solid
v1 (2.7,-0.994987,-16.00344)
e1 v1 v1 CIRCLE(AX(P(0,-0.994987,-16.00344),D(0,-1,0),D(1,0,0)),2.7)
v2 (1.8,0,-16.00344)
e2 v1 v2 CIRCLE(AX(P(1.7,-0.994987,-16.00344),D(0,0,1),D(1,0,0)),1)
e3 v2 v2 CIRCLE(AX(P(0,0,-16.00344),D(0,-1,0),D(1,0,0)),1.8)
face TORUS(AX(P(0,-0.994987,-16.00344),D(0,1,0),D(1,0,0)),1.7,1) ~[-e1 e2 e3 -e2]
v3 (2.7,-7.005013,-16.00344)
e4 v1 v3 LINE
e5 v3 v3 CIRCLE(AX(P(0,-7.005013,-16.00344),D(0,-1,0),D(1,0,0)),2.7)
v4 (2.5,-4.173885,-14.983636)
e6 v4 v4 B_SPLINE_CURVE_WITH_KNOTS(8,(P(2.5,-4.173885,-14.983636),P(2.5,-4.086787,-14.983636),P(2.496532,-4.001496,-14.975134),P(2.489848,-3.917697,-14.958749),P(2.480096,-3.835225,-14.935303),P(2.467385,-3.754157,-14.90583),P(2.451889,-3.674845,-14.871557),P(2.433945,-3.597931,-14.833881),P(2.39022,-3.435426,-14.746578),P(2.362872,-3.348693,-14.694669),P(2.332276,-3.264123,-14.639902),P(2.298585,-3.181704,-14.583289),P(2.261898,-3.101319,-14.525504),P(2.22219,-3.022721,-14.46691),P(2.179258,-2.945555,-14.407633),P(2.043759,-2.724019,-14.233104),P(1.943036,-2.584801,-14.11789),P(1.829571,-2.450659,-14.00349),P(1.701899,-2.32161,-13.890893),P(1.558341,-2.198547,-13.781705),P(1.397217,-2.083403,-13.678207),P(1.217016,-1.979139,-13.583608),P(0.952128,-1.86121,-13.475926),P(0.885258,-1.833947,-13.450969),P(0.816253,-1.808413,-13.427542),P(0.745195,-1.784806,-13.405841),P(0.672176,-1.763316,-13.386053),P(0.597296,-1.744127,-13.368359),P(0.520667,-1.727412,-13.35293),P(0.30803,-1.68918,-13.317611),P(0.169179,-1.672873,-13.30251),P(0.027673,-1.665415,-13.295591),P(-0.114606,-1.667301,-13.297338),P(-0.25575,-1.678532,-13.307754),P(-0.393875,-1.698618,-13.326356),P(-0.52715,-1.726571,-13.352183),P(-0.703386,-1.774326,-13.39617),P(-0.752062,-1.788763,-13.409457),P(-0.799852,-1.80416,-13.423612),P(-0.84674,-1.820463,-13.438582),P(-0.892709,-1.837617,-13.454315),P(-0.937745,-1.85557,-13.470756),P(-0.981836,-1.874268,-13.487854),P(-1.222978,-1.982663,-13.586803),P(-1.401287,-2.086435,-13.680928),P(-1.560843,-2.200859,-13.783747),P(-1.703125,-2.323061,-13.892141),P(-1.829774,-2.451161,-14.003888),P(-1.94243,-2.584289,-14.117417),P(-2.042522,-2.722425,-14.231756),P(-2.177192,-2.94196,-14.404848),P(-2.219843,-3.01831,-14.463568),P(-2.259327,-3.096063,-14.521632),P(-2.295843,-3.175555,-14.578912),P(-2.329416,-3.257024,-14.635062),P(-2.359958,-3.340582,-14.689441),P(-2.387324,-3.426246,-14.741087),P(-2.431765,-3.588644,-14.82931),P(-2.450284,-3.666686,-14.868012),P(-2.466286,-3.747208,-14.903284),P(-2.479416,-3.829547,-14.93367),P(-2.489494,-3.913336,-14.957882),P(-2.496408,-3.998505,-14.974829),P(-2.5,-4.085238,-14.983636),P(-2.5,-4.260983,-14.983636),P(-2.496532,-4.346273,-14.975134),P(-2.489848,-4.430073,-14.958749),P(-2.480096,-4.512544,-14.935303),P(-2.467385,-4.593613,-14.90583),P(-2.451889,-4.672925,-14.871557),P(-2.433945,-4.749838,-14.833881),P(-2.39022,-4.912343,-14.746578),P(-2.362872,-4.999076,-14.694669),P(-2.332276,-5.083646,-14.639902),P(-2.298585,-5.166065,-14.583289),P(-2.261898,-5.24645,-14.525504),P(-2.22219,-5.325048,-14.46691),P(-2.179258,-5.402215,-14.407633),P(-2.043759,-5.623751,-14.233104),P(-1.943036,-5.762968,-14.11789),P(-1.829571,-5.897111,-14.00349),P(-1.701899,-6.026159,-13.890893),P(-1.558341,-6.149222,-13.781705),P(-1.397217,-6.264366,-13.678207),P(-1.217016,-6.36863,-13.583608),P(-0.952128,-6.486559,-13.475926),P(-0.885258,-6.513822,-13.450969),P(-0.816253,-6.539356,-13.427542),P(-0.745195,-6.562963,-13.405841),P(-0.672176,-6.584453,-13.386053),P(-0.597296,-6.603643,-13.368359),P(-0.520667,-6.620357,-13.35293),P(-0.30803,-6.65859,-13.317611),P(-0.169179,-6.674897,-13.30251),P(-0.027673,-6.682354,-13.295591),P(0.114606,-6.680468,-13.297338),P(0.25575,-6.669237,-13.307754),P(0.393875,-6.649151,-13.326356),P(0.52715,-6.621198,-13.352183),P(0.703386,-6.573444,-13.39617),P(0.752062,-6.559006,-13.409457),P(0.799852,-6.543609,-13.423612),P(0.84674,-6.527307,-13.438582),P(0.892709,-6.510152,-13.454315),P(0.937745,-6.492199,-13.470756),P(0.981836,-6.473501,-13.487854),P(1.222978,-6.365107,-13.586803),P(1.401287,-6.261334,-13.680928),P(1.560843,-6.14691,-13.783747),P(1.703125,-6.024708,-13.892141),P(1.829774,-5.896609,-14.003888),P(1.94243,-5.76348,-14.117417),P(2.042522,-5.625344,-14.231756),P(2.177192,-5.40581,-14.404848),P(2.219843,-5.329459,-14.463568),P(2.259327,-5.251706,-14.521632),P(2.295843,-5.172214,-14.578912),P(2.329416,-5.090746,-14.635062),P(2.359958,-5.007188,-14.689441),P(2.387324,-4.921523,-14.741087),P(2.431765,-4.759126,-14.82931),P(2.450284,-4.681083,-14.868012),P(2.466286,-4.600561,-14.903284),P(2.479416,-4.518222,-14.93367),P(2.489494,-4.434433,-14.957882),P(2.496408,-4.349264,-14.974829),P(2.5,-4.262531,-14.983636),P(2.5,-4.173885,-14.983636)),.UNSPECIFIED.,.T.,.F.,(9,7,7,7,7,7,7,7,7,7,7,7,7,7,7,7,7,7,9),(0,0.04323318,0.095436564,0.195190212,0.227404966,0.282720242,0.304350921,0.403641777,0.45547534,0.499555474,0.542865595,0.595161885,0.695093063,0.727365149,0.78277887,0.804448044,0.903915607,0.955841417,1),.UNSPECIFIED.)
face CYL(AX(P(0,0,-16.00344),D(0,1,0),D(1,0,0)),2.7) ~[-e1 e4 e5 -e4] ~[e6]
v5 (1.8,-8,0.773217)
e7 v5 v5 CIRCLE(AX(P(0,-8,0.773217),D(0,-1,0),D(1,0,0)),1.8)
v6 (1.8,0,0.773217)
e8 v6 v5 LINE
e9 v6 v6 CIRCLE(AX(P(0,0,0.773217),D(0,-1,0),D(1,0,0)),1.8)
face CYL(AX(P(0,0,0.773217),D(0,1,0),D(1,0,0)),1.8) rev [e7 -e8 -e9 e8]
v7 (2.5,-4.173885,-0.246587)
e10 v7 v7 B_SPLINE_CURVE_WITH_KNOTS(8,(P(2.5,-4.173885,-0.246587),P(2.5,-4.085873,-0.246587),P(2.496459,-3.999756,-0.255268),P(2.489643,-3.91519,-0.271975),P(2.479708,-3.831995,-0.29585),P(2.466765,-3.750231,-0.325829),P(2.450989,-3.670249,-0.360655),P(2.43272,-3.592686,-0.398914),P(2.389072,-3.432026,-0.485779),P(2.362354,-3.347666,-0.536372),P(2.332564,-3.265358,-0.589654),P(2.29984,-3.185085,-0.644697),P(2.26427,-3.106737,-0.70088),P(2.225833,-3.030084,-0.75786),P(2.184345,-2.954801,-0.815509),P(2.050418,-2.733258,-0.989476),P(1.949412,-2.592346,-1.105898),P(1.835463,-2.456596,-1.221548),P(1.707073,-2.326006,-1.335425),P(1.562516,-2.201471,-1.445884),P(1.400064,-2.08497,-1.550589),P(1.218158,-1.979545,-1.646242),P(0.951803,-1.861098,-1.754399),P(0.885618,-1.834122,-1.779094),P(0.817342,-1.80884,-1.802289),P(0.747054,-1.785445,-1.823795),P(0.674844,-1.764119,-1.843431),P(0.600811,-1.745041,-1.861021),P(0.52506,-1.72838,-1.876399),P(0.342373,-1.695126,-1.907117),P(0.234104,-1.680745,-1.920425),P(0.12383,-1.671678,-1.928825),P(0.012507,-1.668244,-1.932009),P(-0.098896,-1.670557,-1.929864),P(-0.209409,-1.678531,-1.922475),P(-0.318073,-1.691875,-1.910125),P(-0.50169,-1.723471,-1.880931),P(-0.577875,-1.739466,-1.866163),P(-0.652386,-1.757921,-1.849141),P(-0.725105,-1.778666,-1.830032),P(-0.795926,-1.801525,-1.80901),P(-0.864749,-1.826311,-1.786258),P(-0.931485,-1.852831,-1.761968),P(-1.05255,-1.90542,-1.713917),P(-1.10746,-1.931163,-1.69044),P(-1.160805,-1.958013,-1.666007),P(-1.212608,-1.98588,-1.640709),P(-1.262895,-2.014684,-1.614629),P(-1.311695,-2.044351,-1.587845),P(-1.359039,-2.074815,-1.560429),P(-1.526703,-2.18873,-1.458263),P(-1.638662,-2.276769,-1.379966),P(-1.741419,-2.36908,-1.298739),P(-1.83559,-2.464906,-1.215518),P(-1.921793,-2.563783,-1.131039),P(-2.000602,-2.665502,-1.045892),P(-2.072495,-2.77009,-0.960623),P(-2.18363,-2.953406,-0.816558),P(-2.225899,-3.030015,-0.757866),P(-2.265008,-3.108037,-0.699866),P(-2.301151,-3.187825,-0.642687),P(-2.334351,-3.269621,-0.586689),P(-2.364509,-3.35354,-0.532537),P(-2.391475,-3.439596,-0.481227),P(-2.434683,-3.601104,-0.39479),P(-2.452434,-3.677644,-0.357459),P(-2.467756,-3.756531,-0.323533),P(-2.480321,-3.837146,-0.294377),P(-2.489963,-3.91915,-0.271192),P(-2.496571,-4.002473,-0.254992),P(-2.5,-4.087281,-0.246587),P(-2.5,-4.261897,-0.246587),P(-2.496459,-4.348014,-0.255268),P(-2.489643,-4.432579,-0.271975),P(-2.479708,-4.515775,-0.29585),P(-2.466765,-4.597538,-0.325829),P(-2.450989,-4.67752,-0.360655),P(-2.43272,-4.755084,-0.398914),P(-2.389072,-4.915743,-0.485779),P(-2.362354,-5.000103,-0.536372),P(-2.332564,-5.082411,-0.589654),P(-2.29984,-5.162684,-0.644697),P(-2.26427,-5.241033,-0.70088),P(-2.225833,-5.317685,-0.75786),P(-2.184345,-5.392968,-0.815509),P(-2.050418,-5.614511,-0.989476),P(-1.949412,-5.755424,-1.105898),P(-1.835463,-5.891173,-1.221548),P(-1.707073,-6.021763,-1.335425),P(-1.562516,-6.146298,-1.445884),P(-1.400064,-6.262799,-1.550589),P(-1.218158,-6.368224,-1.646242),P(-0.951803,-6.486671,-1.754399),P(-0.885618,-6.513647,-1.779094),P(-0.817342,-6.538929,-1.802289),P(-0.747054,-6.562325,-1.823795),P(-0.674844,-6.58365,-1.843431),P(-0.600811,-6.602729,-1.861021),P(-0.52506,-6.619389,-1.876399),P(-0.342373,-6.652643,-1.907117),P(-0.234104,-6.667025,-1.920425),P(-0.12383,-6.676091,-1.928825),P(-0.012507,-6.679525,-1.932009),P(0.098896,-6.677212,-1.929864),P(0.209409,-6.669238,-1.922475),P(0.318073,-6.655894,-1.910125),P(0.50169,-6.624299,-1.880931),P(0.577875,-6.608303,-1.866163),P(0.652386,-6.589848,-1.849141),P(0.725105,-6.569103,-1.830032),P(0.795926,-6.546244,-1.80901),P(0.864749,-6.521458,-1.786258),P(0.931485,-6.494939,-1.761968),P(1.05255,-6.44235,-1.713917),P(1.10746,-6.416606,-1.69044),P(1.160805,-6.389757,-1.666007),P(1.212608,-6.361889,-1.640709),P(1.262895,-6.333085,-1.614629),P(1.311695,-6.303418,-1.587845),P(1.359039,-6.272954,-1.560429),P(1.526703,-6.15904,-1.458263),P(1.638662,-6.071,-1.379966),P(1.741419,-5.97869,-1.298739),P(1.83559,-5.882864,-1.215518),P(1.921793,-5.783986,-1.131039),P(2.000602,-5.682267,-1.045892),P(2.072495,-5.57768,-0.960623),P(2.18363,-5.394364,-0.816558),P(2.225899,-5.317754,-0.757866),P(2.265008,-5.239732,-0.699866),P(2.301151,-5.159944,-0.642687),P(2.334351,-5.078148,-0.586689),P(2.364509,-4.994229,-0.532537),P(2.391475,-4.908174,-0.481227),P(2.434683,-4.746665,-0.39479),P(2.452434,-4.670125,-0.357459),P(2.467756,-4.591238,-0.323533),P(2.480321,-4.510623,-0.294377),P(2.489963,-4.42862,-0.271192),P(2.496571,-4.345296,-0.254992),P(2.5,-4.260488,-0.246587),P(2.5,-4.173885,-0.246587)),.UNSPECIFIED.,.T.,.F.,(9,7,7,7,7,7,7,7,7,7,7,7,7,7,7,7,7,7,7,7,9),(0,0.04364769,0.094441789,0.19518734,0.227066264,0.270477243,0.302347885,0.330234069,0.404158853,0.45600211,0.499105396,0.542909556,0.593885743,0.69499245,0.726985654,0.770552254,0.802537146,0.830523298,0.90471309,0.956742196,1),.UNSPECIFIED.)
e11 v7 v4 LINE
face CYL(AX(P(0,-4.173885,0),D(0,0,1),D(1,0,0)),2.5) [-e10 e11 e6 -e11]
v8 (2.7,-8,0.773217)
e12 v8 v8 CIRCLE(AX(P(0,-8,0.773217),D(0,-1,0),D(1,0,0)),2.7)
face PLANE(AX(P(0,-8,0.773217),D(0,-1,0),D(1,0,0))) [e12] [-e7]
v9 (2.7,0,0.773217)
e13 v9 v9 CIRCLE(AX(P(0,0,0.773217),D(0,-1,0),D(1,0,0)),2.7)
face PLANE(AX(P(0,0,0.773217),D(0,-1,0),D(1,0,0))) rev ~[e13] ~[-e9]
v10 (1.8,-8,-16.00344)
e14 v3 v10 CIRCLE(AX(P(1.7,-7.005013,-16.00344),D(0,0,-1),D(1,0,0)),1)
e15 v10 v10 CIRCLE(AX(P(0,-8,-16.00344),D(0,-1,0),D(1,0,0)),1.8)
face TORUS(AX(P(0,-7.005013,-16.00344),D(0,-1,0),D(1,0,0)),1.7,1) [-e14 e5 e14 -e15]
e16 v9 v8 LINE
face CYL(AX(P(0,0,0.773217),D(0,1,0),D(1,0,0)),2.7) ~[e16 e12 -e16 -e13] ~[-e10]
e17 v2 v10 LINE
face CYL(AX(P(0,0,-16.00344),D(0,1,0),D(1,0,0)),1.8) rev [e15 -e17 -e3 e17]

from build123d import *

# Parameters (mm, degrees)
F0_R     = 2.7
F0_R_2   = 1.8
F1_DEPTH = 8
F2_R     = 2.5
F3_DEPTH = 16
F4_DEPTH = 25
F5_R     = 2.7
F5_R_2   = 1.8
F6_DEPTH = 8
F7_DEPTH = 25


# Not quite as in the source:
# - a fillet or chamfer that OpenCascade refuses, or shapes differently, is made with other operations: its cross-section is extruded or revolved along the edge and cut away or added


with BuildPart() as f1:
    # F0 (on Front) → F1 (new body)
    with BuildSketch(Plane.XZ):
        with Locations((0, 0.773217123)):
            Circle(F0_R)
        with Locations((0, 0.773217123)):
            Circle(F0_R_2, mode=Mode.SUBTRACT)
    extrude(amount=F1_DEPTH)

    # F2 (on Top) → F3 (join)
    with BuildSketch(Plane.XY):
        with Locations((0, -4.1738846339)):
            Circle(F2_R)
    extrude(amount=-F3_DEPTH)

    # F0 (on Front) → F4 (cut)
    with BuildSketch(Plane.XZ):
        with Locations((0, 0.773217123)):
            Circle(F0_R_2)
    extrude(amount=F4_DEPTH, mode=Mode.SUBTRACT)

    # F5 (on Front) → F6 (join, through all)
    with BuildSketch(Plane.XZ):
        with Locations((0, -16.0034396241)):
            Circle(F5_R)
        with Locations((0, -16.0034396241)):
            Circle(F5_R_2, mode=Mode.SUBTRACT)
    extrude(amount=F6_DEPTH)

    # F5 (on Front) → F7 (cut)
    with BuildSketch(Plane.XZ):
        with Locations((0, -16.0034396241)):
            Circle(F5_R_2)
    extrude(amount=F7_DEPTH, mode=Mode.SUBTRACT)

    # F8: fillet of radius 1 on 1 edges, made by hand

    # F8_s1 → F8_t2 (revolve, cut)
    with BuildSketch(Plane.XY.offset(-16.0034396241)):
        with BuildLine():
            ThreePointArc((2.7, -0.9949874371), (2.4416198487, -0.3241670439), (1.8, 0))
            Line((1.8, 0), (2.7, 0))
            Line((2.7, 0), (2.7, -0.9949874371))
        make_face()
    revolve(axis=Axis((0, 0, -16.0034396241), (0, -1, 0)), mode=Mode.SUBTRACT)

    # F9: fillet of radius 1 on 1 edges, made by hand

    # F9_s1 → F9_t2 (revolve, cut)
    with BuildSketch(Plane.XY.offset(-16.0034396241)):
        with BuildLine():
            ThreePointArc((2.7, -7.0050125629), (2.4416198487, -7.6758329561), (1.8, -8))
            Line((1.8, -8), (2.7, -8))
            Line((2.7, -8), (2.7, -7.0050125629))
        make_face()
    revolve(axis=Axis((0, -8, -16.0034396241), (0, -1, 0)), mode=Mode.SUBTRACT)


solid = f1.part
